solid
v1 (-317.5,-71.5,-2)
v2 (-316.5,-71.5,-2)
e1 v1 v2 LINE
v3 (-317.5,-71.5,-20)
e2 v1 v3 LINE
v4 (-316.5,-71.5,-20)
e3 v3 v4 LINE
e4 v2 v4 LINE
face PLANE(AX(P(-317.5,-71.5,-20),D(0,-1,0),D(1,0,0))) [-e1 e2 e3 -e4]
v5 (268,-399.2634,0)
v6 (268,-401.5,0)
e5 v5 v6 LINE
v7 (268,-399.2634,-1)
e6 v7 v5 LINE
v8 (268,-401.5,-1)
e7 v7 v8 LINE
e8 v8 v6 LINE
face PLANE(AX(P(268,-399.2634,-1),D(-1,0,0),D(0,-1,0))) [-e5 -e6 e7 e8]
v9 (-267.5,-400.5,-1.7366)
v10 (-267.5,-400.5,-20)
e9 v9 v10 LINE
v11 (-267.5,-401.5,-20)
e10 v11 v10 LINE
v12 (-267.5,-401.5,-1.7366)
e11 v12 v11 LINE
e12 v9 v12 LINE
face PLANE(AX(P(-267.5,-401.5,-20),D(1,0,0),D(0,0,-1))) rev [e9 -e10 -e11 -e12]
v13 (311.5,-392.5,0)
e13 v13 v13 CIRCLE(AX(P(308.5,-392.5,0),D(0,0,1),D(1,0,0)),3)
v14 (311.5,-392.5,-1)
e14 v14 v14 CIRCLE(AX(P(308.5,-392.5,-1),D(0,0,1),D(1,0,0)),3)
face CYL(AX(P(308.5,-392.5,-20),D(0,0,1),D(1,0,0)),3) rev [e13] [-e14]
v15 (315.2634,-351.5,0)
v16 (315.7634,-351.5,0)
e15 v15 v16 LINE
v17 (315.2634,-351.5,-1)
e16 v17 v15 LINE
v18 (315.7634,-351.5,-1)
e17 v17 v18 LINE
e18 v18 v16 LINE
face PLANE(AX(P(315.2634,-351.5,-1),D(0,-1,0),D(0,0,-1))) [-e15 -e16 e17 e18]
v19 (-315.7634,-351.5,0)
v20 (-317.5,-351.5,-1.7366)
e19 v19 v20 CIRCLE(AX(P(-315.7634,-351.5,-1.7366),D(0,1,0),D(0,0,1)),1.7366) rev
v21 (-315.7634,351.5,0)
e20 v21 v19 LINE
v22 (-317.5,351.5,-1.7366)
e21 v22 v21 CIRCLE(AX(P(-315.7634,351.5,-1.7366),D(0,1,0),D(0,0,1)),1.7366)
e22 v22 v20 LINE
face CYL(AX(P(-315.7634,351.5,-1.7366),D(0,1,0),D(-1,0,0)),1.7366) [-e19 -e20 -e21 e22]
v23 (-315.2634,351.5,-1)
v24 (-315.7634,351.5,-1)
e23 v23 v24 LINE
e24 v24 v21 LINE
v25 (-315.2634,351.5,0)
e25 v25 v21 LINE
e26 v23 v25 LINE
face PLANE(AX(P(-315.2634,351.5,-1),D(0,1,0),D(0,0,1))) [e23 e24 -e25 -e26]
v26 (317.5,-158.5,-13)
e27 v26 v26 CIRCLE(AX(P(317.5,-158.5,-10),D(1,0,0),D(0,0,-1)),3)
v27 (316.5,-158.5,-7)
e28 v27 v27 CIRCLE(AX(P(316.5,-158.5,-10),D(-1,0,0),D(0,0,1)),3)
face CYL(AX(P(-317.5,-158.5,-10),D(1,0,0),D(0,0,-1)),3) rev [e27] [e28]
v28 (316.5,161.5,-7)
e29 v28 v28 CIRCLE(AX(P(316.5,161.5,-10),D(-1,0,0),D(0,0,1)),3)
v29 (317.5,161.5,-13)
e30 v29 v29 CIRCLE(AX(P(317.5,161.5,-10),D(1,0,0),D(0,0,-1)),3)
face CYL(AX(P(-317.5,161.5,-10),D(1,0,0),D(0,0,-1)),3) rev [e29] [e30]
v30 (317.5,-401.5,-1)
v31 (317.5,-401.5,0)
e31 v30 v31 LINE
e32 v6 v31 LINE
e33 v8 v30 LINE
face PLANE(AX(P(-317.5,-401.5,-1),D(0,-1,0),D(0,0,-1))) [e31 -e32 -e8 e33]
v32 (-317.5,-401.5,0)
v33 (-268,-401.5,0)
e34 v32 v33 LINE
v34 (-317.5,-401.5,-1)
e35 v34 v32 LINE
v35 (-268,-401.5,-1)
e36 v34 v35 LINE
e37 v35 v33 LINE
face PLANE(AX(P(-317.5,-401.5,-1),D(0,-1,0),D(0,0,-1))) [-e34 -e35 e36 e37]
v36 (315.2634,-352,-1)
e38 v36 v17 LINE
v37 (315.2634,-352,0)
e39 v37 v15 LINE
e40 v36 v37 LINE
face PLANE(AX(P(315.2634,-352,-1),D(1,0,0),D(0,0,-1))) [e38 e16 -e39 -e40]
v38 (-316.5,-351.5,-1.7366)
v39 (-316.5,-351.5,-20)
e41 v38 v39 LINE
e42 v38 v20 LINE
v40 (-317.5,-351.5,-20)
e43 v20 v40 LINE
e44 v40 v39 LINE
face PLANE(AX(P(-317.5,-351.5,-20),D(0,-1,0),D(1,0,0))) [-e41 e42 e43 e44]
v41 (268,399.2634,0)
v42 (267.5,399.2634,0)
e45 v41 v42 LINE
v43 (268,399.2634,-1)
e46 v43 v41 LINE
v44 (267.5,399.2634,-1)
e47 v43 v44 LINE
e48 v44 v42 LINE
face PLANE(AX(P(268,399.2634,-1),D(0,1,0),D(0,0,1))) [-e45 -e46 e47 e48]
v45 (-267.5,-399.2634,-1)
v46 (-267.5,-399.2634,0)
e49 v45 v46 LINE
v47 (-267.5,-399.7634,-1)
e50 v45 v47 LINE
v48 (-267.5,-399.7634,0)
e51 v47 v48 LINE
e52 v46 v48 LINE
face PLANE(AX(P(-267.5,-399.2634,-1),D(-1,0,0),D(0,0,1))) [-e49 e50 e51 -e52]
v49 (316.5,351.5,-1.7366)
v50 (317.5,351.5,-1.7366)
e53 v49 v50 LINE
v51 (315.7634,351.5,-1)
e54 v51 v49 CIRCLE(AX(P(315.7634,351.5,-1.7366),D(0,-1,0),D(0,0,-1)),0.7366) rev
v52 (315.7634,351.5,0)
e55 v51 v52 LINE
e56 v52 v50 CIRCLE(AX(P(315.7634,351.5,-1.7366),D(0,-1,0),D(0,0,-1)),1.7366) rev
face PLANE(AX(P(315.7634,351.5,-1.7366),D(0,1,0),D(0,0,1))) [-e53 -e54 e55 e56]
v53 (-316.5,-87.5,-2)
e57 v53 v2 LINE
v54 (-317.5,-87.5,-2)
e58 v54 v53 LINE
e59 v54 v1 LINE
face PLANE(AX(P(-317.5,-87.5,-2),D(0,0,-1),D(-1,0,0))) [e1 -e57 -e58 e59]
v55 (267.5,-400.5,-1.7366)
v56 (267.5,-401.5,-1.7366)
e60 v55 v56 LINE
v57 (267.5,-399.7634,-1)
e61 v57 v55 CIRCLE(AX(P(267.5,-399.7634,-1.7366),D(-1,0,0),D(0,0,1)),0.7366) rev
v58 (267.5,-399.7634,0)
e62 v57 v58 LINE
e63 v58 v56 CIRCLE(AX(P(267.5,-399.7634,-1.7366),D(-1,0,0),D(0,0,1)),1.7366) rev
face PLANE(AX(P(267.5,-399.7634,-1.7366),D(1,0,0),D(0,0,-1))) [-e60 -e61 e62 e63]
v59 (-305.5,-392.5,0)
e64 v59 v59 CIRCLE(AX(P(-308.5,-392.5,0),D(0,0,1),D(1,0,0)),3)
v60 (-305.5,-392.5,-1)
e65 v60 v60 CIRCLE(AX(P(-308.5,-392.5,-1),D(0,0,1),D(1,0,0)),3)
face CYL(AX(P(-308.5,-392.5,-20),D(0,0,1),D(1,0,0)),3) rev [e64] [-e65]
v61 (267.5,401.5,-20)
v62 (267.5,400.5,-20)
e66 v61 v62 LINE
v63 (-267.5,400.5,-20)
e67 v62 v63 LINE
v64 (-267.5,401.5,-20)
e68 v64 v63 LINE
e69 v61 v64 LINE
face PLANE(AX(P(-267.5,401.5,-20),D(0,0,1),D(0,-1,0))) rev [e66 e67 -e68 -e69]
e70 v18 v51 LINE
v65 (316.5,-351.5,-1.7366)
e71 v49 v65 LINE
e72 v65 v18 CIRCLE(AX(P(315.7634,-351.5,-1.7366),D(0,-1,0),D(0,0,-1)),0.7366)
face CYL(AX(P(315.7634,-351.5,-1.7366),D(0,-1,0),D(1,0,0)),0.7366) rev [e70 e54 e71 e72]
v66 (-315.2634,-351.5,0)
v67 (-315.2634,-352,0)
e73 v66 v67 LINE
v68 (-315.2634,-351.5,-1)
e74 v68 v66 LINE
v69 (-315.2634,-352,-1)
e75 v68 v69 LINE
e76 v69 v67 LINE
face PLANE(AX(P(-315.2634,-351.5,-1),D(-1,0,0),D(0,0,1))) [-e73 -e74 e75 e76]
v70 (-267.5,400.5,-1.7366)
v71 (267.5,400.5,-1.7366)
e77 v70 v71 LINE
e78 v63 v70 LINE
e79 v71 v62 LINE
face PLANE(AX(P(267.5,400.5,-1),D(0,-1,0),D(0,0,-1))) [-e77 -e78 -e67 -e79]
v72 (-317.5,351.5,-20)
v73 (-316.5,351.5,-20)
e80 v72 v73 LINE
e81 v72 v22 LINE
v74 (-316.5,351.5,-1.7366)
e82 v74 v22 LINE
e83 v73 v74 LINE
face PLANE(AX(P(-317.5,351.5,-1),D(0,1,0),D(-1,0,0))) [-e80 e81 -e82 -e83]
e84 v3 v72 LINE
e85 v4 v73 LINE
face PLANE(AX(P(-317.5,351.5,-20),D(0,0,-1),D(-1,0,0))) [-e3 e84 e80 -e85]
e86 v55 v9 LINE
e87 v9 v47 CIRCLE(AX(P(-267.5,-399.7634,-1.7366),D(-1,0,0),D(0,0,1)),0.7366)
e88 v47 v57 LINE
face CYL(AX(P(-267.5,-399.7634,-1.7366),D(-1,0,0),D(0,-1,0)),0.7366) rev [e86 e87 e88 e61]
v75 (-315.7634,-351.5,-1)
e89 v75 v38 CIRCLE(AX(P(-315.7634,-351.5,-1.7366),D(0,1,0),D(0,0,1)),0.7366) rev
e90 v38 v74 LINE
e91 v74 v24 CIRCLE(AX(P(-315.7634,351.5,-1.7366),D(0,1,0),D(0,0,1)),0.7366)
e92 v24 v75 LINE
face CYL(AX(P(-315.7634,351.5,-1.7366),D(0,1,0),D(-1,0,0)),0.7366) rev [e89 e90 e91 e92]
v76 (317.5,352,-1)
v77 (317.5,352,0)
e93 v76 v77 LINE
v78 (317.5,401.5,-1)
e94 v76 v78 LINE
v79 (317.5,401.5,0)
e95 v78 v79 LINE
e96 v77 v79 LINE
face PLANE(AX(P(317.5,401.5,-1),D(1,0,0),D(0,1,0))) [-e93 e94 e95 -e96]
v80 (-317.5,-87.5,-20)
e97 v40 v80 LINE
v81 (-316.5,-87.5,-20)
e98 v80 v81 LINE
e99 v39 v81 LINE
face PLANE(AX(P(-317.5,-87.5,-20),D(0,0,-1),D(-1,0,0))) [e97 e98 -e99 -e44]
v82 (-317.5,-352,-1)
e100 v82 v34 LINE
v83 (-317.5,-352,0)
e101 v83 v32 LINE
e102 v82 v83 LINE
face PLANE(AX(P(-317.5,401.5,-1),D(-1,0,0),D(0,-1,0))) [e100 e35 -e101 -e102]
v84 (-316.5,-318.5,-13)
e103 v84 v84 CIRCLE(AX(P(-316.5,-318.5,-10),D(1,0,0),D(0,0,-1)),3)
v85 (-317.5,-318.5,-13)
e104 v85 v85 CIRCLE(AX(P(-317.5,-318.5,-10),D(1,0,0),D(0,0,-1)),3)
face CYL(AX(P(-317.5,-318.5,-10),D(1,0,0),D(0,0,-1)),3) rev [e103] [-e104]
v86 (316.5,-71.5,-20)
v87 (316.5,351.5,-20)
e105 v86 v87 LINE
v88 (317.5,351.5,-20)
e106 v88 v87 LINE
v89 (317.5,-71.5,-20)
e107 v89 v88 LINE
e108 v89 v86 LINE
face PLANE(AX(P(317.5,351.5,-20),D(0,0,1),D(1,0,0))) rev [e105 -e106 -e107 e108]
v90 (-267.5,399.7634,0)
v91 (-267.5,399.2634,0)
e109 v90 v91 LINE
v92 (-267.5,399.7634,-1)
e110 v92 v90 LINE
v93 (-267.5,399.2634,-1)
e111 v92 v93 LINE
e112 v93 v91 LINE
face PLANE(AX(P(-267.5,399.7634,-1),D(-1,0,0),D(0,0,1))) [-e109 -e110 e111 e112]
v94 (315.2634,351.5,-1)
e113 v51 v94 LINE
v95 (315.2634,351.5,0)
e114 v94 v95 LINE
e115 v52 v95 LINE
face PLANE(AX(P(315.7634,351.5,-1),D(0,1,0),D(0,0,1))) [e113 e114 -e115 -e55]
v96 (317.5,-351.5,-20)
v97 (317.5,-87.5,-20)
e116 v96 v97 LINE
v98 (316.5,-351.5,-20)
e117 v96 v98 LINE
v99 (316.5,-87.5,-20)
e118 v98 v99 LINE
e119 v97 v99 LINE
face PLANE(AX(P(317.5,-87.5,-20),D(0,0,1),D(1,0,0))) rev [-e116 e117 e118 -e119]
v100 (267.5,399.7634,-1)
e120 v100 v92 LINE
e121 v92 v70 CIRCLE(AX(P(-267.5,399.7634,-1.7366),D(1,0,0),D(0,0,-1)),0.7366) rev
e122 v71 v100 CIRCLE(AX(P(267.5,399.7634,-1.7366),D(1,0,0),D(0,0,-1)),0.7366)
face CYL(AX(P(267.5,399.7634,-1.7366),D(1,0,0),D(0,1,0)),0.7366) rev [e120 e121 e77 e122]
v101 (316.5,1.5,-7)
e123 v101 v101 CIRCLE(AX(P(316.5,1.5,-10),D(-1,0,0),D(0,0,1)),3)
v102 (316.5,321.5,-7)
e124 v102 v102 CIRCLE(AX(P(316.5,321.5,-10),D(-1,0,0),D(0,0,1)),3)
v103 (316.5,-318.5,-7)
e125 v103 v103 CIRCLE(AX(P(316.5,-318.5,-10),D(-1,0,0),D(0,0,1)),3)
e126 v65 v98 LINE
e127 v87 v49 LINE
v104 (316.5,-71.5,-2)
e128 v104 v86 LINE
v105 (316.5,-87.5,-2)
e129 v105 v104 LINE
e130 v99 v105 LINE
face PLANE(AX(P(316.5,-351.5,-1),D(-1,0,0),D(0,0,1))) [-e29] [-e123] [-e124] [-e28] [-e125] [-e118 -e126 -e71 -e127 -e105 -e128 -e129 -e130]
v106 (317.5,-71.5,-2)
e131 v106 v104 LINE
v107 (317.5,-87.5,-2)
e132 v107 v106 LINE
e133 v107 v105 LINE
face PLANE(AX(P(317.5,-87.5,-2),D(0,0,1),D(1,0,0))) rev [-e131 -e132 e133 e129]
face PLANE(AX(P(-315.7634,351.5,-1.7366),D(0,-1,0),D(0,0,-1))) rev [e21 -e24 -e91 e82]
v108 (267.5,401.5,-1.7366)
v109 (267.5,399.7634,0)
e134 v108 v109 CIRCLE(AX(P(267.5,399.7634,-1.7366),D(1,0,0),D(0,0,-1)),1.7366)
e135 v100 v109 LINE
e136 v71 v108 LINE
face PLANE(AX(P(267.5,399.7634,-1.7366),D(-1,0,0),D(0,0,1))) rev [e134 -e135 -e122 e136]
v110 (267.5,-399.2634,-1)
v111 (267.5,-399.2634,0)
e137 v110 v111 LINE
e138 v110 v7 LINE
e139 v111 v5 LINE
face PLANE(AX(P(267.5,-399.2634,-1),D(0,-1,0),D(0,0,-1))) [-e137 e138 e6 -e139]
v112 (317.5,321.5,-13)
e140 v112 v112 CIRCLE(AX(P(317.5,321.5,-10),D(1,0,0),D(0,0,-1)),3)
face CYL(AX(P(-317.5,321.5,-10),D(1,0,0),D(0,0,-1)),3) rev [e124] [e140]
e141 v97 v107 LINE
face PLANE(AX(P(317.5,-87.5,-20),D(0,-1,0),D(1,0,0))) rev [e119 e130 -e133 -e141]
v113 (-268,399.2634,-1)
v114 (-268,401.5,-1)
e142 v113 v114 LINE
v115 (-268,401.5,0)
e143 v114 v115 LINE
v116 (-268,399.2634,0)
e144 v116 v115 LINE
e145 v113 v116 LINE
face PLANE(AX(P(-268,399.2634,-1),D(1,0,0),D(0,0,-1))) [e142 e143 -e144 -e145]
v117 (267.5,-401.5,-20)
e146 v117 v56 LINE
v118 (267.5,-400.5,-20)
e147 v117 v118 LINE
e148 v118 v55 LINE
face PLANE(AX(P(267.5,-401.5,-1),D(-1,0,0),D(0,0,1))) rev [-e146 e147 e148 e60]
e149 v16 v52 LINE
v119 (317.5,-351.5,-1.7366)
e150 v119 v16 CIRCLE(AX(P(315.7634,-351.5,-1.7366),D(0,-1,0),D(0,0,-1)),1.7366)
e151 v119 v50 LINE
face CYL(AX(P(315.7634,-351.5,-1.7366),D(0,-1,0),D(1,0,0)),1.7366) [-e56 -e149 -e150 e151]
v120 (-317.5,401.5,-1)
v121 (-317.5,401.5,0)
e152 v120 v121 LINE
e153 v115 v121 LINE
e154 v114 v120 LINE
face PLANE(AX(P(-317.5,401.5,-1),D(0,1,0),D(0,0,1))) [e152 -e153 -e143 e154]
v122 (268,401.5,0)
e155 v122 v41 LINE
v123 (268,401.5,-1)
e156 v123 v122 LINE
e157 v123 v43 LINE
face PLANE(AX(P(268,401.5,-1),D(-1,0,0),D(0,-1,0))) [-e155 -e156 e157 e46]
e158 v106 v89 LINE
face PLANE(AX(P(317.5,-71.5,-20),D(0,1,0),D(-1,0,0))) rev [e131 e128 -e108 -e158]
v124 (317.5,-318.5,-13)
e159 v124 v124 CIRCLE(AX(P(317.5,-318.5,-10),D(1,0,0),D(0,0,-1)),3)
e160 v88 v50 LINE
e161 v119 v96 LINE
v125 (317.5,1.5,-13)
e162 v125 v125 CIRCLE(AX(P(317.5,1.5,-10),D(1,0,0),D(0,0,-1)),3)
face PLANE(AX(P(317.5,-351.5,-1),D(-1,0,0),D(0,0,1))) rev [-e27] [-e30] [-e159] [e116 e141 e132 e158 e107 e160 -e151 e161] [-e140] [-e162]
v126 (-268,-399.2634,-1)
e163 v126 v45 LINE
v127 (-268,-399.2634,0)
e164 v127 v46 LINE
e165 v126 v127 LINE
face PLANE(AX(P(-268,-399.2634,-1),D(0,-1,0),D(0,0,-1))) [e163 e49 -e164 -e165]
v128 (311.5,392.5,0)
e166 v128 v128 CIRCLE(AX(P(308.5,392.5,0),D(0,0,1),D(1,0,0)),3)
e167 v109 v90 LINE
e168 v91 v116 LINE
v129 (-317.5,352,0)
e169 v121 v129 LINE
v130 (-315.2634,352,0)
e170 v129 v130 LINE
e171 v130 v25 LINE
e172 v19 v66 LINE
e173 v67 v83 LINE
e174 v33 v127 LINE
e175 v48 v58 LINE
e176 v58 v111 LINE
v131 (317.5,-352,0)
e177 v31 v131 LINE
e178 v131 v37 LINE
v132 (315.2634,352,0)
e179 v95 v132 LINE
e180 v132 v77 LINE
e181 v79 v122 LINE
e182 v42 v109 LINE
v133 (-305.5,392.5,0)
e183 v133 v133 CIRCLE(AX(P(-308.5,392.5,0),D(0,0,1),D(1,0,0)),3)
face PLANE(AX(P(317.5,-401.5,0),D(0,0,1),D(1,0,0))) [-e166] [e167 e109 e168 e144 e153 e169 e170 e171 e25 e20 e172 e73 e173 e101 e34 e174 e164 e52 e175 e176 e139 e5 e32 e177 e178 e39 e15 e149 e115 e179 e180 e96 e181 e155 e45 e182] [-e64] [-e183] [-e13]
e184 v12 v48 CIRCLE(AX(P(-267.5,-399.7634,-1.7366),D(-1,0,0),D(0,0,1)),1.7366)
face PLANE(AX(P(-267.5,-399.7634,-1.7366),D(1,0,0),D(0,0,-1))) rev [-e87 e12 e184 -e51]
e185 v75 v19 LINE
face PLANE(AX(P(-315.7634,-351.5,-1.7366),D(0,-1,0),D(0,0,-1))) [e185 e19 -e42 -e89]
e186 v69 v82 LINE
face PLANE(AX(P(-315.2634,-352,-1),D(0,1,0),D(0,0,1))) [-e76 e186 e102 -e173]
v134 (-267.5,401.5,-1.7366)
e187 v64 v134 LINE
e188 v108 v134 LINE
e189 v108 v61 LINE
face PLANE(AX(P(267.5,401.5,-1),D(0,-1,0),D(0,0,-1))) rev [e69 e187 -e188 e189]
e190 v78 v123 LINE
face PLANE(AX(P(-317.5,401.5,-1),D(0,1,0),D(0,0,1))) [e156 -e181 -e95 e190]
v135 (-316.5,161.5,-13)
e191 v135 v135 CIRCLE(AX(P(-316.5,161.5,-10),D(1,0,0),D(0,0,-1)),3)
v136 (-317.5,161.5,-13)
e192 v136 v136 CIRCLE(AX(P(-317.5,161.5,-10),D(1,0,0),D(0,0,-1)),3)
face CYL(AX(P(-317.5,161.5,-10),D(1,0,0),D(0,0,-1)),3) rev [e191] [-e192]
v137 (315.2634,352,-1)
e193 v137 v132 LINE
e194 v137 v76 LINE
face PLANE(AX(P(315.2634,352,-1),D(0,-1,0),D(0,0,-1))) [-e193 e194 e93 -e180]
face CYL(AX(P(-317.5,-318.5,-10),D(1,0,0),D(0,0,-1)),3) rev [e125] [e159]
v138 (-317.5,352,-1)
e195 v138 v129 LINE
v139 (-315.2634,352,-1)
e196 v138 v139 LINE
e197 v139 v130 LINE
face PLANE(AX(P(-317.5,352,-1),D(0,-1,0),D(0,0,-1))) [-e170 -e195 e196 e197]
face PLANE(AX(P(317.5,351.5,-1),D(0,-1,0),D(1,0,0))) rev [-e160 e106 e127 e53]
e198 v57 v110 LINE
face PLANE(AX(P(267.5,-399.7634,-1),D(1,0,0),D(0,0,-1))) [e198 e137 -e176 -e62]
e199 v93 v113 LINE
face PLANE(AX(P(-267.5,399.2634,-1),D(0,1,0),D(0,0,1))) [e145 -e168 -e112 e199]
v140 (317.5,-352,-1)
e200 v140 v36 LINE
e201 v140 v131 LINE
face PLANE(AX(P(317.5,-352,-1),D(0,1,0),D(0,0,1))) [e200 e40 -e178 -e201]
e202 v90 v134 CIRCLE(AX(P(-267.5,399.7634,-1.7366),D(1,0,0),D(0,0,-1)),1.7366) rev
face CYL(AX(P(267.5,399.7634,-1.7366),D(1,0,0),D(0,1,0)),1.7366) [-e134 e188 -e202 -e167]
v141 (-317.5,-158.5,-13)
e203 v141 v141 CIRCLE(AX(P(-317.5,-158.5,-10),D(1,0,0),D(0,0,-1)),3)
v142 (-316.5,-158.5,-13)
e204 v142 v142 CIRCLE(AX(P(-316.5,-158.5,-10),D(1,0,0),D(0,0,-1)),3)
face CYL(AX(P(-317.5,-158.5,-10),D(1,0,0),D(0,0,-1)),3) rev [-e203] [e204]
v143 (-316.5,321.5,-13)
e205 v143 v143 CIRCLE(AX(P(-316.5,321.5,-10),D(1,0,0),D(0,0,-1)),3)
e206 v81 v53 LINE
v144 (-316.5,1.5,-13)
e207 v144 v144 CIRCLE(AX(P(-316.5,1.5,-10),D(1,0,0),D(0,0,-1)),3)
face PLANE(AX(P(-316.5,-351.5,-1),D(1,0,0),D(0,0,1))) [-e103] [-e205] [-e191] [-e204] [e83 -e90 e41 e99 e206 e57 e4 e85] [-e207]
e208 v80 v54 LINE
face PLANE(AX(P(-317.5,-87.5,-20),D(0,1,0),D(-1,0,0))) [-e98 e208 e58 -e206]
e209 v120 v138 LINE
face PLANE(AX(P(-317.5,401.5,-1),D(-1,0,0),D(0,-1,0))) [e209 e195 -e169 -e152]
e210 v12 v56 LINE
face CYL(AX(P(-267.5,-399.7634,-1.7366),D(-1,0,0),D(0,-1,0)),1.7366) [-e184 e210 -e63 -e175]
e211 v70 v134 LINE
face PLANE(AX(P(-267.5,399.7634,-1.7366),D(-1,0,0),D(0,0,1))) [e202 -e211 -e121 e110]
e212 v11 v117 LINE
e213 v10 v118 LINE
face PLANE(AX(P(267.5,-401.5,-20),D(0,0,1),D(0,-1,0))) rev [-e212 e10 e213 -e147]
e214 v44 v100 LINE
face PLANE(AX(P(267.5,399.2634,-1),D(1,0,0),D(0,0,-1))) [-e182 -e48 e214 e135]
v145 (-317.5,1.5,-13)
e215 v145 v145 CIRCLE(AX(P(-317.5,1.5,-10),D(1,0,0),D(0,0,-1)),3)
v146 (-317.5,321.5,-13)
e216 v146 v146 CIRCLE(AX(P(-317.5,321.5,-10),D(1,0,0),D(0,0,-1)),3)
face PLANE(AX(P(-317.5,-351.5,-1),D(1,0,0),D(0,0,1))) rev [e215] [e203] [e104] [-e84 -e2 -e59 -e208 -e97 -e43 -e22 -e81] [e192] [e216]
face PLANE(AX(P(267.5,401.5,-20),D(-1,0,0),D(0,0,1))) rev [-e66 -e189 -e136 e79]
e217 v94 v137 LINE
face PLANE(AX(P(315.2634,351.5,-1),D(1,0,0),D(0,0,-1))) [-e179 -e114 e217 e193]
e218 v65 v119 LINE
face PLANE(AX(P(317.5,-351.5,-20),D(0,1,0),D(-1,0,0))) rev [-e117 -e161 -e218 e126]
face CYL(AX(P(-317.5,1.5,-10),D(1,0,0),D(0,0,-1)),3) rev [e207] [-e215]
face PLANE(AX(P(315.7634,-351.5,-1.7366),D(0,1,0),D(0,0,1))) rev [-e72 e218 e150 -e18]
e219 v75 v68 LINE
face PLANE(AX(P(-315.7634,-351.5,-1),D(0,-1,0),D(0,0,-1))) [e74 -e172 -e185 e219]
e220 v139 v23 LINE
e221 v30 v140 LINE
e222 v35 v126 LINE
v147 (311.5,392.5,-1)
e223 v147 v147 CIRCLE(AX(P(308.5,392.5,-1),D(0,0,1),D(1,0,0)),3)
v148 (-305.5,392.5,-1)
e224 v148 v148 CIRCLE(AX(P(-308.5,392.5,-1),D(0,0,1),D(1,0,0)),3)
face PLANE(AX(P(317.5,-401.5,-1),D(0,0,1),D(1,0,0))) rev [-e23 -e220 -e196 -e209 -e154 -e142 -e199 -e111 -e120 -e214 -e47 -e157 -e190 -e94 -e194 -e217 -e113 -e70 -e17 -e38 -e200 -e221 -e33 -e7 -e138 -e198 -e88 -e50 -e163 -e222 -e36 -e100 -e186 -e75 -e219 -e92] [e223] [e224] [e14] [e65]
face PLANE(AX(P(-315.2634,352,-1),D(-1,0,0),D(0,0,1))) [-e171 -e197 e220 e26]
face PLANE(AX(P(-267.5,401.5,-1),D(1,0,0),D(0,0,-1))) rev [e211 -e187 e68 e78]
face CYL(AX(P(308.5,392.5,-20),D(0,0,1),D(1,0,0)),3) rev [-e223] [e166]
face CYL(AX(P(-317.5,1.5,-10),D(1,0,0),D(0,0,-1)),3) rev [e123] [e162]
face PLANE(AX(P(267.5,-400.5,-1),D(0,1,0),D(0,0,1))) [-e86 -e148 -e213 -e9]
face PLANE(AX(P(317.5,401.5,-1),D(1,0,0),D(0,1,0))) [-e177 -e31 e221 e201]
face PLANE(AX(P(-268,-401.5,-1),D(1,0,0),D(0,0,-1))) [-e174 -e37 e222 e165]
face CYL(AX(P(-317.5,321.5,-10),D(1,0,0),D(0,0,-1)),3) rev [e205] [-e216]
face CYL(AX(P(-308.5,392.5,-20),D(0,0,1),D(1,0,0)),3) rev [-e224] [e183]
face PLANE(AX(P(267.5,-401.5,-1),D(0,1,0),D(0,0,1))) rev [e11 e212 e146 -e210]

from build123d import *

# Parameters (mm, degrees)
SKETCH_1_W                        = 635
SKETCH_1_H                        = 803
SM_BASE_FLANGE_1_DEPTH            = 1
SM_EDGE_FLANGE_1_STRIP_W          = 5.4732
SM_EDGE_FLANGE_1_STRIP_H          = 1
SM_EDGE_FLANGE_1_STRIP_CUT_DEPTH  = 535
SM_EDGE_FLANGE_1_RELIEF_W         = 5.9732
SM_EDGE_FLANGE_1_RELIEF_H         = 0.5
SM_EDGE_FLANGE_1_RELIEF_CUT_DEPTH = 1
SM_EDGE_FLANGE_1_DEPTH            = 535
SM_EDGE_FLANGE_2_STRIP_W          = 5.4732
SM_EDGE_FLANGE_2_STRIP_H          = 1
SM_EDGE_FLANGE_2_STRIP_CUT_DEPTH  = 535
SM_EDGE_FLANGE_2_RELIEF_W         = 5.9732
SM_EDGE_FLANGE_2_RELIEF_H         = 0.5
SM_EDGE_FLANGE_2_RELIEF_CUT_DEPTH = 1
SM_EDGE_FLANGE_2_DEPTH            = 535
SM_EDGE_FLANGE_3_STRIP_W          = 5.4732
SM_EDGE_FLANGE_3_STRIP_H          = 1
SM_EDGE_FLANGE_3_STRIP_CUT_DEPTH  = 703
SM_EDGE_FLANGE_3_RELIEF_W         = 5.9732
SM_EDGE_FLANGE_3_RELIEF_H         = 0.5
SM_EDGE_FLANGE_3_RELIEF_CUT_DEPTH = 1
SM_EDGE_FLANGE_3_DEPTH            = 703
SM_EDGE_FLANGE_3_FLAT_DEPTH       = 1
SKETCH_15_R                       = 3
CUT_EXTRUDE_2_DEPTH               = 752.549898543
SKETCH_16_R                       = 3
CUT_EXTRUDE_3_DEPTH               = 513.258235659


# Sheet-metal steps are written as plain solids
with BuildPart() as part:
    # Sketch 1 → 基体-法兰1 (new body)
    with BuildSketch(Plane.XY):
        Rectangle(SKETCH_1_W, SKETCH_1_H)
    extrude(amount=-SM_BASE_FLANGE_1_DEPTH)

    # 边线-法兰1 strip (across the edge) → 边线-法兰1 strip cut (cut)
    with BuildSketch(Plane(origin=(-267.5, 401.5, -1), x_dir=(0, -1, 0), z_dir=(1, 0, 0))):
        with Locations((-1, -0.5)):
            Rectangle(SM_EDGE_FLANGE_1_STRIP_W, SM_EDGE_FLANGE_1_STRIP_H)
    extrude(amount=SM_EDGE_FLANGE_1_STRIP_CUT_DEPTH, mode=Mode.SUBTRACT)

    # 边线-法兰1 relief (on the sheet) → 边线-法兰1 relief cut (cut)
    with BuildSketch(Plane(origin=(-267.5, 399.7634, -1), x_dir=(0, -1, 0), z_dir=(0, 0, -1))):
        with Locations((-2.4866, 0.25)):
            Rectangle(SM_EDGE_FLANGE_1_RELIEF_W, SM_EDGE_FLANGE_1_RELIEF_H)
        with Locations((-2.4866, -535.25)):
            Rectangle(SM_EDGE_FLANGE_1_RELIEF_W, SM_EDGE_FLANGE_1_RELIEF_H)
    extrude(amount=-SM_EDGE_FLANGE_1_RELIEF_CUT_DEPTH, mode=Mode.SUBTRACT)

    # 边线-法兰1 section (across the edge) → 边线-法兰1 (add)
    with BuildSketch(Plane(origin=(-267.5, 401.5, -1), x_dir=(0, -1, 0), z_dir=(1, 0, 0))):
        with BuildLine():
            Line((0, 0.7366), (0, 19))
            Line((0, 19), (1, 19))
            Line((1, 19), (1, 0.7366))
            ThreePointArc((1, 0.7366), (1.215745145, 0.215745145), (1.7366, 0))
            Line((1.7366, 0), (1.7366, -1))
            ThreePointArc((1.7366, -1), (0.508638364, -0.491361636), (0, 0.7366))
        make_face()
    extrude(amount=SM_EDGE_FLANGE_1_DEPTH)

    # 边线-法兰2 strip (across the edge) → 边线-法兰2 strip cut (cut)
    with BuildSketch(Plane(origin=(267.5, -401.5, -1), x_dir=(0, 1, 0), z_dir=(-1, 0, 0))):
        with Locations((-1, -0.5)):
            Rectangle(SM_EDGE_FLANGE_2_STRIP_W, SM_EDGE_FLANGE_2_STRIP_H)
    extrude(amount=SM_EDGE_FLANGE_2_STRIP_CUT_DEPTH, mode=Mode.SUBTRACT)

    # 边线-法兰2 relief (on the sheet) → 边线-法兰2 relief cut (cut)
    with BuildSketch(Plane(origin=(267.5, -399.7634, -1), x_dir=(0, 1, 0), z_dir=(0, 0, -1))):
        with Locations((-2.4866, 0.25)):
            Rectangle(SM_EDGE_FLANGE_2_RELIEF_W, SM_EDGE_FLANGE_2_RELIEF_H)
        with Locations((-2.4866, -535.25)):
            Rectangle(SM_EDGE_FLANGE_2_RELIEF_W, SM_EDGE_FLANGE_2_RELIEF_H)
    extrude(amount=-SM_EDGE_FLANGE_2_RELIEF_CUT_DEPTH, mode=Mode.SUBTRACT)

    # 边线-法兰2 section (across the edge) → 边线-法兰2 (add)
    with BuildSketch(Plane(origin=(267.5, -401.5, -1), x_dir=(0, 1, 0), z_dir=(-1, 0, 0))):
        with BuildLine():
            Line((0, 0.7366), (0, 19))
            Line((0, 19), (1, 19))
            Line((1, 19), (1, 0.7366))
            ThreePointArc((1, 0.7366), (1.215745145, 0.215745145), (1.7366, 0))
            Line((1.7366, 0), (1.7366, -1))
            ThreePointArc((1.7366, -1), (0.508638364, -0.491361636), (0, 0.7366))
        make_face()
    extrude(amount=SM_EDGE_FLANGE_2_DEPTH)

    # 边线-法兰3 strip (across the edge) → 边线-法兰3 strip cut (cut)
    with BuildSketch(Plane(origin=(317.5, 351.5, -1), x_dir=(-1, 0, 0), z_dir=(0, -1, 0))):
        with Locations((-1, -0.5)):
            Rectangle(SM_EDGE_FLANGE_3_STRIP_W, SM_EDGE_FLANGE_3_STRIP_H)
    sm_edge_flange_3_strip_cut = extrude(amount=SM_EDGE_FLANGE_3_STRIP_CUT_DEPTH, mode=Mode.SUBTRACT)

    # 边线-法兰3 relief (on the sheet) → 边线-法兰3 relief cut (cut)
    with BuildSketch(Plane(origin=(315.7634, 351.5, -1), x_dir=(-1, 0, 0), z_dir=(0, 0, -1))):
        with Locations((-2.4866, 0.25)):
            Rectangle(SM_EDGE_FLANGE_3_RELIEF_W, SM_EDGE_FLANGE_3_RELIEF_H)
        with Locations((-2.4866, -703.25)):
            Rectangle(SM_EDGE_FLANGE_3_RELIEF_W, SM_EDGE_FLANGE_3_RELIEF_H)
    sm_edge_flange_3_relief_cut = extrude(amount=-SM_EDGE_FLANGE_3_RELIEF_CUT_DEPTH, mode=Mode.SUBTRACT)

    # 边线-法兰3 bend section (across the edge) → 边线-法兰3 (add)
    with BuildSketch(Plane(origin=(317.5, 351.5, -1), x_dir=(-1, 0, 0), z_dir=(0, -1, 0))):
        with BuildLine():
            Line((0, 0.7366), (1, 0.7366))
            ThreePointArc((1, 0.7366), (1.215745145, 0.215745145), (1.7366, 0))
            Line((1.7366, 0), (1.7366, -1))
            ThreePointArc((1.7366, -1), (0.508638364, -0.491361636), (0, 0.7366))
        make_face()
    sm_edge_flange_3 = extrude(amount=SM_EDGE_FLANGE_3_DEPTH)

    # 边线-法兰3 profile (on flange) → 边线-法兰3 flat (add)
    with BuildSketch(Plane(origin=(317.5, 0, -1), x_dir=(0, -1, 0), z_dir=(1, 0, 0))):
        Polygon((351.5, 0.7366), (351.5, 19), (87.5, 19), (87.5, 1), (71.5, 1), (71.5, 19), (-351.5, 19), (-351.5, 0.7366), align=None)
    sm_edge_flange_3_flat = extrude(amount=-SM_EDGE_FLANGE_3_FLAT_DEPTH)

    # 镜向1: 边线-法兰3 strip cut, 边线-法兰3 relief cut, 边线-法兰3, 边线-法兰3 flat across plane
    add(sm_edge_flange_3_strip_cut.mirror(Plane(origin=(0, 0, 0), x_dir=(0, 0, 1), z_dir=(1, 0, 0))), mode=Mode.SUBTRACT)
    add(sm_edge_flange_3_relief_cut.mirror(Plane(origin=(0, 0, 0), x_dir=(0, 0, 1), z_dir=(1, 0, 0))), mode=Mode.SUBTRACT)
    add(sm_edge_flange_3.mirror(Plane(origin=(0, 0, 0), x_dir=(0, 0, 1), z_dir=(1, 0, 0))))
    add(sm_edge_flange_3_flat.mirror(Plane(origin=(0, 0, 0), x_dir=(0, 0, 1), z_dir=(1, 0, 0))))

    # 草图15 → 切除-拉伸2 (cut, through all)
    with BuildSketch(Plane(origin=(317.5, 0, 0), x_dir=(0, 0, -1), z_dir=(1, 0, 0))):
        with Locations((10, 321.5)):
            Circle(SKETCH_15_R)
        with Locations((10, 161.5)):
            Circle(SKETCH_15_R)
        with Locations((10, 1.5)):
            Circle(SKETCH_15_R)
        with Locations((10, -158.5)):
            Circle(SKETCH_15_R)
        with Locations((10, -318.5)):
            Circle(SKETCH_15_R)
    extrude(amount=-CUT_EXTRUDE_2_DEPTH, mode=Mode.SUBTRACT)

    # 草图16 → 切除-拉伸3 (cut, through all)
    with BuildSketch(Plane.XY):
        with Locations((308.5, 392.5)):
            Circle(SKETCH_16_R)
        with Locations((308.5, -392.5)):
            Circle(SKETCH_16_R)
        with Locations((-308.5, 392.5)):
            Circle(SKETCH_16_R)
        with Locations((-308.5, -392.5)):
            Circle(SKETCH_16_R)
    extrude(amount=-CUT_EXTRUDE_3_DEPTH, mode=Mode.SUBTRACT)


solid = part.part
